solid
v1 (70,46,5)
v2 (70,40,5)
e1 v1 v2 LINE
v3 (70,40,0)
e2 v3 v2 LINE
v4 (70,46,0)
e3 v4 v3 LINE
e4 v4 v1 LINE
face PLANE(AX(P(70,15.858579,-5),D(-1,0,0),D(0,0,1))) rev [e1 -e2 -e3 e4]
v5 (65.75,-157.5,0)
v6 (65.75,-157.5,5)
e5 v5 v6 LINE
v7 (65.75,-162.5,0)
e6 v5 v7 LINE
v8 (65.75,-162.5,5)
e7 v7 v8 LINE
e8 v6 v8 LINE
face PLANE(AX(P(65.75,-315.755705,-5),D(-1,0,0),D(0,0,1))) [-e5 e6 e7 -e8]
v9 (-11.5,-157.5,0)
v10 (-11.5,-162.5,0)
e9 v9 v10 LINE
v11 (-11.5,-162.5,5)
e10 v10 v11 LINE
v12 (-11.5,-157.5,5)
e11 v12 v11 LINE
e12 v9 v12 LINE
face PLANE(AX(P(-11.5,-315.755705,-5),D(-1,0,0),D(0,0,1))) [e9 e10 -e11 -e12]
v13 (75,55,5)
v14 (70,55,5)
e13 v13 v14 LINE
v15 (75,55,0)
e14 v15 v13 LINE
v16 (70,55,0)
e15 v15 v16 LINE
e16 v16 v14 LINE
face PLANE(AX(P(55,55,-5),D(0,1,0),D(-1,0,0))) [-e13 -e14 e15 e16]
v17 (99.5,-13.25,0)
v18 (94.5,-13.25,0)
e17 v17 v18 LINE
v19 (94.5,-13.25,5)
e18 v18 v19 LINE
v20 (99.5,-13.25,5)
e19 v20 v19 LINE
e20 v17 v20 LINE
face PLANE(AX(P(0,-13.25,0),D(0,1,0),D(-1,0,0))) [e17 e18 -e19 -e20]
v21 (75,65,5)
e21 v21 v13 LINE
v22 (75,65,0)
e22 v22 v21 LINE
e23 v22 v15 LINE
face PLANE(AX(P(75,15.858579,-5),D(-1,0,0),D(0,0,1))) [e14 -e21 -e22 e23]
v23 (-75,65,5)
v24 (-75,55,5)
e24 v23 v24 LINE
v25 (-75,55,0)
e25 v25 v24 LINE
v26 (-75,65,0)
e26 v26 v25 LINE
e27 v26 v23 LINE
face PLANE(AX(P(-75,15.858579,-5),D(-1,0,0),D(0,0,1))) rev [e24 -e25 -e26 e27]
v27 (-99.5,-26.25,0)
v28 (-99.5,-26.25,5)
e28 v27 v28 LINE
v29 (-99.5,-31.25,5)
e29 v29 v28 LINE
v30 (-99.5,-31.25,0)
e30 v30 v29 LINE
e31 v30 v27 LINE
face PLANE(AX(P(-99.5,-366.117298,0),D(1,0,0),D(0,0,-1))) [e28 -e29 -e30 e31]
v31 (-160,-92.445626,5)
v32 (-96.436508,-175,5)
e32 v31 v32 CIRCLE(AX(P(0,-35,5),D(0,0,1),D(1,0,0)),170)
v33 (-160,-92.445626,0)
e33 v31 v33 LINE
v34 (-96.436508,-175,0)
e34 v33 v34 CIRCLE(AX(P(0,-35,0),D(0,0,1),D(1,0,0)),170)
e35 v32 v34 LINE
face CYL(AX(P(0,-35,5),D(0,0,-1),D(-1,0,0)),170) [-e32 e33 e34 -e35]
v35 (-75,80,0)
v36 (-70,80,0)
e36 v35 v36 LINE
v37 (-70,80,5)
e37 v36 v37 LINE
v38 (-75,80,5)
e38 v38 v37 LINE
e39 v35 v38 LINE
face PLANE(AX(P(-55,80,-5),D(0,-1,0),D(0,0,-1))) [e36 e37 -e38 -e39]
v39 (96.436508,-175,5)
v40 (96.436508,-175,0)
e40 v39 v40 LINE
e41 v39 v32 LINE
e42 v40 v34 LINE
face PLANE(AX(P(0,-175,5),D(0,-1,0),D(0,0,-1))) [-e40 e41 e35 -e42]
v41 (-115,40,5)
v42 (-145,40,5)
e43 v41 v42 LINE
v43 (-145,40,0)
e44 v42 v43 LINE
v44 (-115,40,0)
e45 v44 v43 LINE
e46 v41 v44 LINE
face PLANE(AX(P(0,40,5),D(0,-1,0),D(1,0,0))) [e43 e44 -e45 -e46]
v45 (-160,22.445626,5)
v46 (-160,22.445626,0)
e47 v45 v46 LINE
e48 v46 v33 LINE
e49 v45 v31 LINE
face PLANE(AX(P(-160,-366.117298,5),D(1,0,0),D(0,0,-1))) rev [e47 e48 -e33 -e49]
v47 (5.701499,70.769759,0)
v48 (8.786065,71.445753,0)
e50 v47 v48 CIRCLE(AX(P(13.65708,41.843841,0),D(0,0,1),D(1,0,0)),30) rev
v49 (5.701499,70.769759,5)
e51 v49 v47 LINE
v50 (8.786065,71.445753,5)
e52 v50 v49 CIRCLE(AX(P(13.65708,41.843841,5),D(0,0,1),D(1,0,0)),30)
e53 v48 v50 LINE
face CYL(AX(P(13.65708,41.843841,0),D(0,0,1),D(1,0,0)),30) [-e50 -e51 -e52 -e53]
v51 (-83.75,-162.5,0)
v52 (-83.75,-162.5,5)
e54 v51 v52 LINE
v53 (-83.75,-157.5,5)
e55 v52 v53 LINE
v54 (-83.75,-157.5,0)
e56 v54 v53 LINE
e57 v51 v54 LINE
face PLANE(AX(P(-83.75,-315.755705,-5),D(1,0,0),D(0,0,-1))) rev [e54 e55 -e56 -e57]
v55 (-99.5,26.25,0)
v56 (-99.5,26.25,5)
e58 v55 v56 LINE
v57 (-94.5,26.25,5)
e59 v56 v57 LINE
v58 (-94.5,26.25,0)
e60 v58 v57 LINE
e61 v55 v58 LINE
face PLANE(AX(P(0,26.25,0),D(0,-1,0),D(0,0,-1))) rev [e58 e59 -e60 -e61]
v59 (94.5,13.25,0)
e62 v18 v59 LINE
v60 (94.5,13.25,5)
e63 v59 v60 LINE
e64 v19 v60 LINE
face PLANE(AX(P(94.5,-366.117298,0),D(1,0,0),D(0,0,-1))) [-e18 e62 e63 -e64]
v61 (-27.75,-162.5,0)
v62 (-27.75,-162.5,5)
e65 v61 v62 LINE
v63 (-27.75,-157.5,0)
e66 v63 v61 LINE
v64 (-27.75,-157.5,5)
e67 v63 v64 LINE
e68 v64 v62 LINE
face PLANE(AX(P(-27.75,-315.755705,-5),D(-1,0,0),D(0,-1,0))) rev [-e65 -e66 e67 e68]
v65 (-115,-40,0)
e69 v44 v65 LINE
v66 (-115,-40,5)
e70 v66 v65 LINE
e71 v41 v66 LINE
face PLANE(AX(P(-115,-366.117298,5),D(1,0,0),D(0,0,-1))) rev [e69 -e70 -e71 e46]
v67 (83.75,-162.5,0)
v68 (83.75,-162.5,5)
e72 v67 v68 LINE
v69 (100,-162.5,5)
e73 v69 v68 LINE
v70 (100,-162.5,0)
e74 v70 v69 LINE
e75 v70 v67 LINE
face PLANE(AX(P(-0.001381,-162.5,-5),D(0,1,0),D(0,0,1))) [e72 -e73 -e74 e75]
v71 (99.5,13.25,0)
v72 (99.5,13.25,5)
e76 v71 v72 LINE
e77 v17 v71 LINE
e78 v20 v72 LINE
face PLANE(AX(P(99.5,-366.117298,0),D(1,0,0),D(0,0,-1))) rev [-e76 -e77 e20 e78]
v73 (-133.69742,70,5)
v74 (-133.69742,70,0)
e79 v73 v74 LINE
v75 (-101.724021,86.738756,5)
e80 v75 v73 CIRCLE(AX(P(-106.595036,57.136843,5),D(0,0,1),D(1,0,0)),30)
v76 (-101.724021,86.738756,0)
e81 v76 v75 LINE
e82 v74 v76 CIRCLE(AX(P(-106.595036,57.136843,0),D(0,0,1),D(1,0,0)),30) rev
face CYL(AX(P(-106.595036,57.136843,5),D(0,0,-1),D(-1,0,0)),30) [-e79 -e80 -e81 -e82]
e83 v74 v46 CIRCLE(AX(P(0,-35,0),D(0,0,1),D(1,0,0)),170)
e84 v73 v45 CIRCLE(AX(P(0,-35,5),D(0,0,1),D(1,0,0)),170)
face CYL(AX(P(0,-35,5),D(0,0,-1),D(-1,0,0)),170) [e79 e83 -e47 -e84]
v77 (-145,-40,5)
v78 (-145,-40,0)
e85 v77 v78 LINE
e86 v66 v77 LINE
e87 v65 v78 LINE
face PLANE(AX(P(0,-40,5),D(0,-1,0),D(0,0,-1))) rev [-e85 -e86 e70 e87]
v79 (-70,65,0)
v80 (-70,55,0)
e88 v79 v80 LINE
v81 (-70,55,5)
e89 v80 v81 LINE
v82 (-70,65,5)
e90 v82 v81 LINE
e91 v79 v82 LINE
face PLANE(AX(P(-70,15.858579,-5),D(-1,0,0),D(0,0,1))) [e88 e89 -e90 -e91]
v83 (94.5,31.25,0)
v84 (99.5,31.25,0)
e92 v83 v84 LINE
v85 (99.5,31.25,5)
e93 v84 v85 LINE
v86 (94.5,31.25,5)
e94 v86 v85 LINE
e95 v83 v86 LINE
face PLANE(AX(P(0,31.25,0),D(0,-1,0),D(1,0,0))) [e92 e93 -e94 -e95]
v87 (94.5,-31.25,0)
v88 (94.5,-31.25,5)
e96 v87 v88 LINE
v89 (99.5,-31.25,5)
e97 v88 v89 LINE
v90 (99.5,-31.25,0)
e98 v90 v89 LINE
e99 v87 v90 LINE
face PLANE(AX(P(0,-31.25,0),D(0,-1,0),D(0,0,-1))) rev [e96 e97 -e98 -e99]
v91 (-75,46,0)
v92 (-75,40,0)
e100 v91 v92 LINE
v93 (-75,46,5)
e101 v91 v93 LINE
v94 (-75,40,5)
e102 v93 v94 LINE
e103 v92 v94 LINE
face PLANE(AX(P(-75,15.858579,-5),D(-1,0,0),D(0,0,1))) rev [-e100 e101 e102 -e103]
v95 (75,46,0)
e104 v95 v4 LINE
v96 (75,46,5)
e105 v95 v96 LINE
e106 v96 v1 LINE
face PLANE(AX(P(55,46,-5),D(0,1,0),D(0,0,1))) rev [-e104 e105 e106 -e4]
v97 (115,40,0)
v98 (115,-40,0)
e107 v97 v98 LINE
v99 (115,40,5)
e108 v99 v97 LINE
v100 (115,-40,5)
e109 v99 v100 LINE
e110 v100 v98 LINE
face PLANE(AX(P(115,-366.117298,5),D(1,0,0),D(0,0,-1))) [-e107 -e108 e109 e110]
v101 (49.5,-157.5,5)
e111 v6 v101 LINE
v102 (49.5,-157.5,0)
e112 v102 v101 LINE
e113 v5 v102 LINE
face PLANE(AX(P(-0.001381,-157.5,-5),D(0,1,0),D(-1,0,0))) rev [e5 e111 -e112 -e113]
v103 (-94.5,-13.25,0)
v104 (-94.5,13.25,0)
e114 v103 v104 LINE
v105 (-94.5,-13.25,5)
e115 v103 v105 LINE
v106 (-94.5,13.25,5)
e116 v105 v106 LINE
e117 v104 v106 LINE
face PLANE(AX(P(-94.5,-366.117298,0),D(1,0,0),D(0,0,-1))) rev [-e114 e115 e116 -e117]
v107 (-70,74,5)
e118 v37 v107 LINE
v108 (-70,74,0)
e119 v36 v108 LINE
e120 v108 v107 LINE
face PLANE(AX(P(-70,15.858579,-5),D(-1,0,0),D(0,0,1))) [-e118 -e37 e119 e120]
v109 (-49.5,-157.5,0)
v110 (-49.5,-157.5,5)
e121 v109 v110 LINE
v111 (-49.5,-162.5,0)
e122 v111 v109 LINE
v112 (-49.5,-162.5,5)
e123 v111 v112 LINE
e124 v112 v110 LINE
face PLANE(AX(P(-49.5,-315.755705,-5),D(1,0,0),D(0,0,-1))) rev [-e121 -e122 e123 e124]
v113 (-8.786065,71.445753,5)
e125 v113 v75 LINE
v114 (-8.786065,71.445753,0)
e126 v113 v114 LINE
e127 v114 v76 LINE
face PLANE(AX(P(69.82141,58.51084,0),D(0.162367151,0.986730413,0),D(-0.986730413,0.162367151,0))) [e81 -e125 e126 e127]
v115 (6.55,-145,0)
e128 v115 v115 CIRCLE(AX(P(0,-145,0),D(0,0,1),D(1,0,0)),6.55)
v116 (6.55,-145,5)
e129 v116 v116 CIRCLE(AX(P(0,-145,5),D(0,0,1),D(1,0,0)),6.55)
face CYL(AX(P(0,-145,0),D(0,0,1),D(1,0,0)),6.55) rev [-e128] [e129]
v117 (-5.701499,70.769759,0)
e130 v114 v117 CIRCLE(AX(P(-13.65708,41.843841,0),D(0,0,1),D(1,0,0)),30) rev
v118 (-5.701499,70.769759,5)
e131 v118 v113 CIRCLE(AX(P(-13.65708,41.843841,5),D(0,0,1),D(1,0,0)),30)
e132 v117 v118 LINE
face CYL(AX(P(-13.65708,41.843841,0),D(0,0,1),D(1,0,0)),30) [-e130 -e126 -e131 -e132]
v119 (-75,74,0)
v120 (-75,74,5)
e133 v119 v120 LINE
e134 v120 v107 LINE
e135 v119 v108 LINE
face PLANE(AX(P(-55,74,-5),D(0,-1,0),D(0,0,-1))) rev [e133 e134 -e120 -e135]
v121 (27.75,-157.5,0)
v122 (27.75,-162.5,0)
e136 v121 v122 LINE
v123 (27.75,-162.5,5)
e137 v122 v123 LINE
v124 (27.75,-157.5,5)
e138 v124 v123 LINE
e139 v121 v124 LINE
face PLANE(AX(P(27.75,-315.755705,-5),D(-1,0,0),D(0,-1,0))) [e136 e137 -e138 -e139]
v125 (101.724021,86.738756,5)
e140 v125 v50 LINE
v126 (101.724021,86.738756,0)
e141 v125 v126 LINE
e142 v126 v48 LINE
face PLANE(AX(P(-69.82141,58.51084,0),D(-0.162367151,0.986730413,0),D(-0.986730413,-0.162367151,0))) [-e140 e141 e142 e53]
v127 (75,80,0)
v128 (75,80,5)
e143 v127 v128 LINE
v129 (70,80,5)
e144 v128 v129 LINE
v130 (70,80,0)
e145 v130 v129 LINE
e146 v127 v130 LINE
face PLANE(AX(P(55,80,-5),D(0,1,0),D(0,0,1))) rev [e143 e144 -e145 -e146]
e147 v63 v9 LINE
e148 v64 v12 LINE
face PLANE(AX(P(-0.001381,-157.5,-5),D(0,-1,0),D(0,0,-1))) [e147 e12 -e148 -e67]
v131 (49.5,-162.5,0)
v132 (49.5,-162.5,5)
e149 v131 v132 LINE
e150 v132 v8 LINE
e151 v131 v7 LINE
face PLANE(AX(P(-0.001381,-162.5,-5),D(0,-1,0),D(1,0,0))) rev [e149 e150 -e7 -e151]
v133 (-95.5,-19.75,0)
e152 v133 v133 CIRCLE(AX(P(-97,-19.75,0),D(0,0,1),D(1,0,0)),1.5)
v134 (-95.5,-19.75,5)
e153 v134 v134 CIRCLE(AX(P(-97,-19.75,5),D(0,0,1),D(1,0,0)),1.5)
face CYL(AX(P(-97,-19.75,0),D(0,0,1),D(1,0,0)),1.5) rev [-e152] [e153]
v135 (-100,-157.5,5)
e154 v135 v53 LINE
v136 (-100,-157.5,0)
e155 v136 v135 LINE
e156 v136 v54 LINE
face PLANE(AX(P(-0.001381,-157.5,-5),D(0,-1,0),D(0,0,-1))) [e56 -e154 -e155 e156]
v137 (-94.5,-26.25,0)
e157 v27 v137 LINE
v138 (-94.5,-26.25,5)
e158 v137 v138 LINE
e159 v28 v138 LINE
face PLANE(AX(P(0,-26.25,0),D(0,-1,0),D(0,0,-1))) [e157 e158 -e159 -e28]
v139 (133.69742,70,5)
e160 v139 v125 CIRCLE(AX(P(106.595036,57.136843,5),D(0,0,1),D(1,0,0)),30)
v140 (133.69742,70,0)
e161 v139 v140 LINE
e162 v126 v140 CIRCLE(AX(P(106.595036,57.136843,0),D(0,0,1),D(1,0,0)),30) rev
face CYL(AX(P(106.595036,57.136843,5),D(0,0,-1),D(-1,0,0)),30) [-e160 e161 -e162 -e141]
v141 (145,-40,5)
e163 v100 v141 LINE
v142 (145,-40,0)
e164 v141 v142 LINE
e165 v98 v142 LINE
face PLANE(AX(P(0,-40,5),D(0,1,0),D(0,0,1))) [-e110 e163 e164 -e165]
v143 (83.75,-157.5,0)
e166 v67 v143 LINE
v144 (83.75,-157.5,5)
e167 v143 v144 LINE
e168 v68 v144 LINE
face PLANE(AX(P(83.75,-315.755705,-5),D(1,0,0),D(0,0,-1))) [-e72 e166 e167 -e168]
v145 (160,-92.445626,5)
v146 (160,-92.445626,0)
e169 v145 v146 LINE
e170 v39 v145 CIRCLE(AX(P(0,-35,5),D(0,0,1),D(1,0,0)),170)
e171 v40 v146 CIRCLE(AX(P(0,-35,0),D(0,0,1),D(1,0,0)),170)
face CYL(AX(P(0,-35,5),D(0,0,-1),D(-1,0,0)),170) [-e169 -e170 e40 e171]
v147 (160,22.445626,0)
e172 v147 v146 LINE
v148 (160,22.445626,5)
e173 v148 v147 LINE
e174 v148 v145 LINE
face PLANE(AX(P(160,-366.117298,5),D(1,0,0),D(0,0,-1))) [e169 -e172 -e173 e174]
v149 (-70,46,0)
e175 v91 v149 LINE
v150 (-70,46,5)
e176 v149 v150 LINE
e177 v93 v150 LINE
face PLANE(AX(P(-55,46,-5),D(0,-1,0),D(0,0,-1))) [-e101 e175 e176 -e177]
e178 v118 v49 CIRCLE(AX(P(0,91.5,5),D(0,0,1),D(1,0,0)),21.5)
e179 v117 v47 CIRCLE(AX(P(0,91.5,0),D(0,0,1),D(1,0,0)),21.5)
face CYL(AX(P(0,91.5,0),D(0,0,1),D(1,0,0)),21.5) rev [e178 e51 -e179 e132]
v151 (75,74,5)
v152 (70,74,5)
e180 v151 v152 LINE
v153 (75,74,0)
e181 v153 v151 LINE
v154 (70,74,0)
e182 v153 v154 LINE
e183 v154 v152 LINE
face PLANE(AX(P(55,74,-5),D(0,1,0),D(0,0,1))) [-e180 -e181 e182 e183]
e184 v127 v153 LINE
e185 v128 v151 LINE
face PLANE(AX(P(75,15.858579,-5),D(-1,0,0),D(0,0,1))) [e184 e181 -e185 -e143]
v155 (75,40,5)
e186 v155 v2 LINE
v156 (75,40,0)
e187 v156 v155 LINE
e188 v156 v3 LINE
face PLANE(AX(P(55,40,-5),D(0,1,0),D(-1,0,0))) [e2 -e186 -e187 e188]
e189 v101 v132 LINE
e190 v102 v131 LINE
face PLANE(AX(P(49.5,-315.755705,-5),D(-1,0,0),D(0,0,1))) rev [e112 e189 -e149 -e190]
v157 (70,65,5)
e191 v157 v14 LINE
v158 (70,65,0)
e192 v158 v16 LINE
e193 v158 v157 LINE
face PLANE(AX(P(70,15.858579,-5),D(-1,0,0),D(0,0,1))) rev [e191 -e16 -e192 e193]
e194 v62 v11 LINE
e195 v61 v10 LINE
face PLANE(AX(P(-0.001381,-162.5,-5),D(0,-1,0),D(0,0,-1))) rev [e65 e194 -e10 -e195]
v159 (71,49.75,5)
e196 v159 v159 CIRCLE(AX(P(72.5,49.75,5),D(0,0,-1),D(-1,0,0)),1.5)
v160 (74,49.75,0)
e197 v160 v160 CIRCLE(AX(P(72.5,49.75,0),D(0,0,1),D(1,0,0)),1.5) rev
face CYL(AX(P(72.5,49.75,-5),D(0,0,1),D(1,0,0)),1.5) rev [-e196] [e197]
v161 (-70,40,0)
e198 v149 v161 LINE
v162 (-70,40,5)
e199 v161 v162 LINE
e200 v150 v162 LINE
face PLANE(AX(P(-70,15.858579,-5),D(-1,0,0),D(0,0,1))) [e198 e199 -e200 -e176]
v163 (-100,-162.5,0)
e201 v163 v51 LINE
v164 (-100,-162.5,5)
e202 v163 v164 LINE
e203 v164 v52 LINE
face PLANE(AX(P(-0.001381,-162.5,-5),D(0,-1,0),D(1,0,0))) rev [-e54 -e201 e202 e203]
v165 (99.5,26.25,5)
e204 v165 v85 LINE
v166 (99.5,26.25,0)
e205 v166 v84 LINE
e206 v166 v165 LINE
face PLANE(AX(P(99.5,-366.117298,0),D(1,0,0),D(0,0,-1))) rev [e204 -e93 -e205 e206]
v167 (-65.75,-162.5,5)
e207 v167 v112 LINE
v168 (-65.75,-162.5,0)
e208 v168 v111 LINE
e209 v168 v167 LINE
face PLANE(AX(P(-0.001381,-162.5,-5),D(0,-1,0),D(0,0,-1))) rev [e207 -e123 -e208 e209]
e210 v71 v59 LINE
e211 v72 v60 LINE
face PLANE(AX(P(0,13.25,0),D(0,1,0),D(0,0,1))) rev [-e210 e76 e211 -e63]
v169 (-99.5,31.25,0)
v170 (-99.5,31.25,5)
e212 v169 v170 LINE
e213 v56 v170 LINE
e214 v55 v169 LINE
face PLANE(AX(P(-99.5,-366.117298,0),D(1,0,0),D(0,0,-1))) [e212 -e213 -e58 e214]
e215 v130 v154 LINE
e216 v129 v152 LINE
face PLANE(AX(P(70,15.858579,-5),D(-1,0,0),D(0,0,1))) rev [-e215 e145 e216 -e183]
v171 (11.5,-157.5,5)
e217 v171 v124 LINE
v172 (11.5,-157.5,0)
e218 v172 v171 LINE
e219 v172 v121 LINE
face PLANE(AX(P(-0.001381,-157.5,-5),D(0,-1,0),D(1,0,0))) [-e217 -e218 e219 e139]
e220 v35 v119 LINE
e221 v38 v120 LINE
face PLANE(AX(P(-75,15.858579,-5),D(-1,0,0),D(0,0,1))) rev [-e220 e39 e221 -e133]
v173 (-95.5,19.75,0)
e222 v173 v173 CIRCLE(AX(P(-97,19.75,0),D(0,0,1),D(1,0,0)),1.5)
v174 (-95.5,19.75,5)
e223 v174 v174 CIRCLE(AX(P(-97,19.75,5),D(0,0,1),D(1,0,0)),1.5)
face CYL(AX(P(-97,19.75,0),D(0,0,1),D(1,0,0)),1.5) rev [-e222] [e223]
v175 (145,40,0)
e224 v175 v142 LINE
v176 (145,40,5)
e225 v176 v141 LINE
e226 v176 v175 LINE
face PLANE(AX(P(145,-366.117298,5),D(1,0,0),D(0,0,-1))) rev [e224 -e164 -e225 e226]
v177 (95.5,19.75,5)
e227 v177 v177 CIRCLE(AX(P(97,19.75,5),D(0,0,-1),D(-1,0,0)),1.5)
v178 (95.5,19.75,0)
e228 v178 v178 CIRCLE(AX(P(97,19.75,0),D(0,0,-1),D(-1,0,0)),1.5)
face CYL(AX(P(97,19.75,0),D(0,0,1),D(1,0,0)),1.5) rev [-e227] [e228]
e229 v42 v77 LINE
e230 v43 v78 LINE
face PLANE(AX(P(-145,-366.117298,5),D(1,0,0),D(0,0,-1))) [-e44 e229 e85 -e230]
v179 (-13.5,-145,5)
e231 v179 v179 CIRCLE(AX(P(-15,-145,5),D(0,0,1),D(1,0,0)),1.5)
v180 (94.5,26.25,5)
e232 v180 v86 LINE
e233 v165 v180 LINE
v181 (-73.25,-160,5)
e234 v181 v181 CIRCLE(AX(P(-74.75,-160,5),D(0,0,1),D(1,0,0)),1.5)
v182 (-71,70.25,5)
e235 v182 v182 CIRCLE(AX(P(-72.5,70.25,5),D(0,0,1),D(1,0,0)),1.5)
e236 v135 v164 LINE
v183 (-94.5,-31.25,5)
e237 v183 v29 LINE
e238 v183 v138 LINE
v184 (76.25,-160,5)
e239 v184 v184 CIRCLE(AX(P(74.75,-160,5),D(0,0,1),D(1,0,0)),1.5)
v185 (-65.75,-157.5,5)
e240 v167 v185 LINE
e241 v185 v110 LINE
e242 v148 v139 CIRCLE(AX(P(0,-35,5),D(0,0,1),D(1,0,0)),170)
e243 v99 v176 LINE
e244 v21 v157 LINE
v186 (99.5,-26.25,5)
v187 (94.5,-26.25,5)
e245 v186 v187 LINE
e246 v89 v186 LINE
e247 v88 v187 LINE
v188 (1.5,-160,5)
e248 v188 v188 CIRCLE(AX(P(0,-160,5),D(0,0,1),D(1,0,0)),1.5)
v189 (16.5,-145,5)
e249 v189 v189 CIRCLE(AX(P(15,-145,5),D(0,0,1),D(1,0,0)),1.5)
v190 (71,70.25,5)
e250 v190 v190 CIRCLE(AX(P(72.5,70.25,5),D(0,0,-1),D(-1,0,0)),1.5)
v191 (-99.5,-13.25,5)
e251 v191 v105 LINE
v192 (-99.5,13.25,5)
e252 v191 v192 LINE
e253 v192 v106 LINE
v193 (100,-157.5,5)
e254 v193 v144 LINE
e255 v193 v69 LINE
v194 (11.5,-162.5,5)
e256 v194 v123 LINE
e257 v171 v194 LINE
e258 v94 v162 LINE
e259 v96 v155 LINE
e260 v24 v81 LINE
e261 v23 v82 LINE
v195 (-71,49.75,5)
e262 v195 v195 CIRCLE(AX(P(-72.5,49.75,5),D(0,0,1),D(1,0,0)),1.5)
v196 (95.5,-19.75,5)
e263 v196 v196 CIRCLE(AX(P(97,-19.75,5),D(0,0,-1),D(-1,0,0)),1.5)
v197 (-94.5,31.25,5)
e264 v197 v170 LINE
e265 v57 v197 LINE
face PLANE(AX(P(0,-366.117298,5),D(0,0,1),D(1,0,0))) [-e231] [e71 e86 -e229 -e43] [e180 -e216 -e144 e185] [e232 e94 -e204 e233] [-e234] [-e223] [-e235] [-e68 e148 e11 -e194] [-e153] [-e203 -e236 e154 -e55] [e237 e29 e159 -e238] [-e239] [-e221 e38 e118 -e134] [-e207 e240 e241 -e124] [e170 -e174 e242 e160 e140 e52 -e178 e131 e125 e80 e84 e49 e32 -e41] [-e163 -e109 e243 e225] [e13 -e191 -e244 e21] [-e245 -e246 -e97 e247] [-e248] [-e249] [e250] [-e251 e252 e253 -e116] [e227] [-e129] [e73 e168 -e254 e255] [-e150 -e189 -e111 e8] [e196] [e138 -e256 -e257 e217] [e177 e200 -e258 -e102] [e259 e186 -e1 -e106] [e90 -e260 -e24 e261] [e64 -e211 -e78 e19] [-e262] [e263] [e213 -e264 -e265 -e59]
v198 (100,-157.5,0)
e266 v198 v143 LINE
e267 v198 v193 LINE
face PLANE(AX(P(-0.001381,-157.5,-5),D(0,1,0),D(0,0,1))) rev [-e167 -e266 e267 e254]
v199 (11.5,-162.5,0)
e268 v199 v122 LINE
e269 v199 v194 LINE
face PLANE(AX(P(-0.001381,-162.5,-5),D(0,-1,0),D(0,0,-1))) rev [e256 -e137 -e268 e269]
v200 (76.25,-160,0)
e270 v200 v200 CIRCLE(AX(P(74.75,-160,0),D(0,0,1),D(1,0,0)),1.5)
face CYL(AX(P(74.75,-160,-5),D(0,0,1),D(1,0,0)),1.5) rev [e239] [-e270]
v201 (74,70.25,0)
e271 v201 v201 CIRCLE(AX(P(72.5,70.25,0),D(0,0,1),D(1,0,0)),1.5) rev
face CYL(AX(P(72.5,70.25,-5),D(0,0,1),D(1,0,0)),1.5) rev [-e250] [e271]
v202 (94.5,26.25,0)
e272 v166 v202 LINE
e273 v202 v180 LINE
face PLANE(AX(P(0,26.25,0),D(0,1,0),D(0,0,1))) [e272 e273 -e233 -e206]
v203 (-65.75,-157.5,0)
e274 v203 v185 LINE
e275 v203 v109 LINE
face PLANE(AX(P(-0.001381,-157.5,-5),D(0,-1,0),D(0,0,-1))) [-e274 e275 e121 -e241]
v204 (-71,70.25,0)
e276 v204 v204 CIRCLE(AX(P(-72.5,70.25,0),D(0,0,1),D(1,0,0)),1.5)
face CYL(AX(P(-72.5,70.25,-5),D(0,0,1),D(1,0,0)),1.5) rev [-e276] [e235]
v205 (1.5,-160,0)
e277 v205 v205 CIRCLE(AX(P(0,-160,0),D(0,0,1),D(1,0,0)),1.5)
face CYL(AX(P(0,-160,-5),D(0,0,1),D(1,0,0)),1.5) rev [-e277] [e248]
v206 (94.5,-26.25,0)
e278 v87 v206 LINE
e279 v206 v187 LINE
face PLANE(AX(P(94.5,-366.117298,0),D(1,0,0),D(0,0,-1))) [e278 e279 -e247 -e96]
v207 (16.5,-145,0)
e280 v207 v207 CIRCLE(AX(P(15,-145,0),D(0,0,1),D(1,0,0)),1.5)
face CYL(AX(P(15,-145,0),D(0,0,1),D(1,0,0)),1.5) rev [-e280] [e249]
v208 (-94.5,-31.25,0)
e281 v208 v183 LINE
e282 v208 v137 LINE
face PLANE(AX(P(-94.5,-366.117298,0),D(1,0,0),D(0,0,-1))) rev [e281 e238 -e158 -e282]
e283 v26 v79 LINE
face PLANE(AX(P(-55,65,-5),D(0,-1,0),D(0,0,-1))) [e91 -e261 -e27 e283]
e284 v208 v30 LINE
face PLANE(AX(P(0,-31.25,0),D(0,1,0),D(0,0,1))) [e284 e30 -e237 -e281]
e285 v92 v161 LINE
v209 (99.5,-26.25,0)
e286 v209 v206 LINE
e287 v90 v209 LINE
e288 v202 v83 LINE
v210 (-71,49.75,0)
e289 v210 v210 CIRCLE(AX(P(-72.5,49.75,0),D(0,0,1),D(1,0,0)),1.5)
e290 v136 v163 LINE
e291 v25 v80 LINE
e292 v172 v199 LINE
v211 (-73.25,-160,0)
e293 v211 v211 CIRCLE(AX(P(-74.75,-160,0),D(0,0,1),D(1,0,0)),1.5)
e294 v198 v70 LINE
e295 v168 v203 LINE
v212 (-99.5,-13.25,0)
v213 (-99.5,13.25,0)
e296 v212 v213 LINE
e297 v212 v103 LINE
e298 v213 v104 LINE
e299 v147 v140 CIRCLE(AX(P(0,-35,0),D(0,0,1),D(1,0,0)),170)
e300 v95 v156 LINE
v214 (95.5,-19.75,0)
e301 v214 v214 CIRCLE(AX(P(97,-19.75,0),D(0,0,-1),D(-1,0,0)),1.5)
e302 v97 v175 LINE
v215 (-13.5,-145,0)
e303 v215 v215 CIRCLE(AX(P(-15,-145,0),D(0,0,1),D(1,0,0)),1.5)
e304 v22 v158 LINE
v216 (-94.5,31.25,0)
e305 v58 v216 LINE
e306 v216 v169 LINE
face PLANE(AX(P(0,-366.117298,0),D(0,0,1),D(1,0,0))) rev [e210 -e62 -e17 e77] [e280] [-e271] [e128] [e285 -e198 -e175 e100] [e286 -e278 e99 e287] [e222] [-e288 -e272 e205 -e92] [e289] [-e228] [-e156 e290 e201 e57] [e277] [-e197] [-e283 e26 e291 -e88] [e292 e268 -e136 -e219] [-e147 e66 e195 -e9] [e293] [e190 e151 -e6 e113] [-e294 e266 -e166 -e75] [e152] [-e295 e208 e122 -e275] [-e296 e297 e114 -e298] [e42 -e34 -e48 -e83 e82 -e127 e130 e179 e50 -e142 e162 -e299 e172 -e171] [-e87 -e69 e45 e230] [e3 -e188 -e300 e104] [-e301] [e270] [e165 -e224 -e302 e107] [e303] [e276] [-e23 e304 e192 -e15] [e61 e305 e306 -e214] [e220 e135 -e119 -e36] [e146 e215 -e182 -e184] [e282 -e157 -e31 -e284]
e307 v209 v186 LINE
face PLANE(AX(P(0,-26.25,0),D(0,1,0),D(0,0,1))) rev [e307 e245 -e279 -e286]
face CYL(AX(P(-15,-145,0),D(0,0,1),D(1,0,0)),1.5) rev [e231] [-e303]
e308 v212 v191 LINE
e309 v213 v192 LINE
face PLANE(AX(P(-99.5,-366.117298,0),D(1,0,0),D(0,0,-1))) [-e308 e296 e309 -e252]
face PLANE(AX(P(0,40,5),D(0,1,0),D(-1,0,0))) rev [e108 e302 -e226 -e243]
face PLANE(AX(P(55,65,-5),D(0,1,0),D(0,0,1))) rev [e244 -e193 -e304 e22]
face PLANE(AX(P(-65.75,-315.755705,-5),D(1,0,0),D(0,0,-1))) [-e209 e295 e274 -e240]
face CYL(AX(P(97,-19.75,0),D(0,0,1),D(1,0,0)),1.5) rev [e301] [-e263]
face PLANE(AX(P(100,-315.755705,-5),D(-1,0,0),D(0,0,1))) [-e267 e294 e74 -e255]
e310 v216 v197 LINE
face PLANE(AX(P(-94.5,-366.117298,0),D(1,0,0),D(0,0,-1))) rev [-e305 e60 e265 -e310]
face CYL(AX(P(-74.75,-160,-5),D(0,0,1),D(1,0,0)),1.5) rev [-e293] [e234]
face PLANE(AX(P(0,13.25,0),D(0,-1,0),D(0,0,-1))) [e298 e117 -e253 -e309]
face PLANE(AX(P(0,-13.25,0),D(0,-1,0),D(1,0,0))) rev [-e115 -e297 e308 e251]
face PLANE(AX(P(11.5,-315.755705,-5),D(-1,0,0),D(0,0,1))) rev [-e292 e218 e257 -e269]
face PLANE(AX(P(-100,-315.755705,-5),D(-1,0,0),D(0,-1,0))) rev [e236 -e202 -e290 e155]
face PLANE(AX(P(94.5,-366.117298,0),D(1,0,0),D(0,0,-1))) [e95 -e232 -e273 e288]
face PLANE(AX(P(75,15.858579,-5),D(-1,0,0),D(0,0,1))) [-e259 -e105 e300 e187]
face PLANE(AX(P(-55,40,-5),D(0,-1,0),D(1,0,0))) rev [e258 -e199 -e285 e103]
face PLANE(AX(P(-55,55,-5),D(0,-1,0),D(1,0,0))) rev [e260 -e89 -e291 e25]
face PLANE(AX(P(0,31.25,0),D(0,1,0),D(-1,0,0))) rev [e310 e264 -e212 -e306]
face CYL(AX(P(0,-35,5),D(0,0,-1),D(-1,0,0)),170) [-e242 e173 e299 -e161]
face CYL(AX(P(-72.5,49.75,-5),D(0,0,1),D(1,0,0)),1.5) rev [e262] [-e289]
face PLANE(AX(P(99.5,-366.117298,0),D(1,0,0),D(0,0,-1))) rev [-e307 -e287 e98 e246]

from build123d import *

# Parameters (mm, degrees)
SKETCH1_W           = 30
SKETCH1_H           = 80
BOSS_EXTRUDE1_DEPTH = 5
SKETCH2_W           = 5
SKETCH2_H           = 26.5
SKETCH2_H_2         = 5
SKETCH2_R           = 1.5
CUT_EXTRUDE1_DEPTH  = 5
BOSS_EXTRUDE2_DEPTH = 5
FILLET1_R           = 30
SKETCH5_R           = 6.55
SKETCH5_R_2         = 1.5
CUT_EXTRUDE2_DEPTH  = 5
SKETCH6_W           = 16.25
SKETCH6_H           = 5
SKETCH6_R           = 1.5
CUT_EXTRUDE3_DEPTH  = 10
SKETCH7_W           = 5
SKETCH7_H           = 5.5
SKETCH7_H_2         = 10
SKETCH7_H_3         = 6
SKETCH7_R           = 1.5
CUT_EXTRUDE4_DEPTH  = 10
SKETCH8_W           = 5.078430198
SKETCH8_H           = 27.315407993
SKETCH8_W_2         = 5
SKETCH8_H_2         = 26.5
BOSS_EXTRUDE4_DEPTH = 5


with BuildPart() as part:
    # Sketch1 → Boss-Extrude1 (new body)
    with BuildSketch(Plane.XY):
        with BuildLine():
            Line((133.697419571, 70), (-133.697419571, 70))
            ThreePointArc((-133.697419571, 70), (-148.761211935, 47.280628484), (-160, 22.445626465))
            Line((-160, 22.445626465), (-160, -92.445626465))
            ThreePointArc((-160, -92.445626465), (-134.69865165, -138.712454622), (-96.43650761, -175))
            Line((-96.43650761, -175), (96.43650761, -175))
            ThreePointArc((96.43650761, -175), (134.69865165, -138.712454622), (160, -92.445626465))
            Line((160, -92.445626465), (160, 22.445626465))
            ThreePointArc((160, 22.445626465), (148.761211935, 47.280628484), (133.697419571, 70))
        make_face()
        with Locations((-130, 0)):
            Rectangle(SKETCH1_W, SKETCH1_H, mode=Mode.SUBTRACT)
        with Locations((130, 0)):
            Rectangle(SKETCH1_W, SKETCH1_H, mode=Mode.SUBTRACT)
    extrude(amount=BOSS_EXTRUDE1_DEPTH)

    # Sketch2 → Cut-Extrude1 (cut)
    with BuildSketch(Plane.XY.offset(5)):
        with Locations((-97, 0)):
            Rectangle(SKETCH2_W, SKETCH2_H)
        with Locations((-97, 28.75)):
            Rectangle(SKETCH2_W, SKETCH2_H_2)
        with Locations((-97, -28.75)):
            Rectangle(SKETCH2_W, SKETCH2_H_2)
        with Locations((-97, -19.75)):
            Circle(SKETCH2_R)
        with Locations((-97, 19.75)):
            Circle(SKETCH2_R)
    cut_extrude1 = extrude(amount=-CUT_EXTRUDE1_DEPTH, mode=Mode.SUBTRACT)

    # Mirror1: Cut-Extrude1 across plane
    add(cut_extrude1.mirror(Plane(origin=(0, 0, 0), x_dir=(0, 0, 1), z_dir=(1, 0, 0))), mode=Mode.SUBTRACT)

    # Sketch3 → Boss-Extrude2 (add)
    with BuildSketch(Plane.XY.offset(5)):
        with BuildLine():
            ThreePointArc((-2.08e-07, 70), (-3.490893846, 70.285296133), (-6.889142051, 71.133612942))
            Line((-6.889142051, 71.133612942), (-133.697419571, 92))
            Line((-133.697419571, 92), (-133.697419571, 70))
            Line((-133.697419571, 70), (-2.08e-07, 70))
        make_face()
        with BuildLine():
            ThreePointArc((6.889142051, 71.133612942), (3.49089364, 70.285296099), (-2.08e-07, 70))
            Line((-2.08e-07, 70), (133.697419571, 70))
            Line((133.697419571, 70), (133.697419571, 92))
            Line((133.697419571, 92), (6.889142051, 71.133612942))
        make_face()
    extrude(amount=-BOSS_EXTRUDE2_DEPTH)

    # Fillet1
    # the kernel refuses this fillet: 30 mm, written as the material it takes off along each edge
    with BuildSketch(Plane(origin=(-6.889142051, 71.133612942, 9.806082425), x_dir=(-0.9867304131972112, 0.16236715083926523, 0), z_dir=(0, 0, -1))) as fillet1_piece_1:
        with BuildLine():
            CenterArc((1.92243297, -30), FILLET1_R, 90, 6.03368508)
            Line((-1.230961232, -0.166191912), (-1.294029116, 0.430484249))
            ThreePointArc((-1.294029116, 0.430484249), (-0.694557768, 0.502617916), (-0.097420291, 0.592038248))
            Line((-0.097420291, 0.592038248), (0, 0.6))
            Line((0, 0.6), (1.92243297, 0.6))
            Line((1.92243297, 0.6), (1.92243297, 0))
        make_face()
    extrude(amount=14.612164849, mode=Mode.SUBTRACT)
    with BuildSketch(Plane(origin=(6.889142051, 71.133612942, 9.806082425), x_dir=(-0.9561345473491755, -0.29292785351582257, 0), z_dir=(0, 0, -1))) as fillet1_piece_2:
        with BuildLine():
            CenterArc((2.108731211, -29.987480741), FILLET1_R, 91.655317917, 6.03368508)
            Line((-1.905148179, -0.257213803), (-1.985425767, 0.337391536))
            Line((-1.985425767, 0.337391536), (-0.080277588, 0.594605339))
            Line((-0.080277588, 0.594605339), (0.017332037, 0.599749615))
            ThreePointArc((0.017332037, 0.599749615), (0.621064672, 0.591027865), (1.224797306, 0.599749615))
            Line((1.224797306, 0.599749615), (1.242129344, 0))
        make_face()
    extrude(amount=14.612164849, mode=Mode.SUBTRACT)
    with BuildSketch(Plane(origin=(133.697419571, 92, 86.008444254), x_dir=(-0.9867304131972118, -0.16236715083926206, 0), z_dir=(0, 0, -1))) as fillet1_piece_3:
        with BuildLine():
            CenterArc((32.403377702, -30), FILLET1_R, 90, 73.954674896)
            Line((3.572077318, -21.70806909), (2.995451311, -21.542230472))
            ThreePointArc((2.995451311, -21.542230472), (1.194000411, -10.951454836), (-0.592038248, -0.097420291))
            Line((-0.592038248, -0.097420291), (0, 0.6))
            Line((0, 0.6), (32.403377702, 0.6))
            Line((32.403377702, 0.6), (32.403377702, 0))
        make_face()
    extrude(amount=167.016888509, mode=Mode.SUBTRACT)
    with BuildSketch(Plane(origin=(-133.697419571, 92, 86.008444254), x_dir=(0, -1, 0), z_dir=(0, 0, -1))) as fillet1_piece_4:
        with BuildLine():
            CenterArc((34.863156511, -27.102383743), FILLET1_R, 115.389646017, 73.954674896)
            Line((5.261244115, -31.973398269), (4.669205867, -32.070818559))
            Line((4.669205867, -32.070818559), (-0.592038248, -0.097420291))
            Line((-0.592038248, -0.097420291), (0, 0.6))
            ThreePointArc((0, 0.6), (11, 0.6), (21.74273687, 0.542047675))
            Line((21.74273687, 0.542047675), (22, 0))
        make_face()
    extrude(amount=167.016888509, mode=Mode.SUBTRACT)

    # Sketch5 → Cut-Extrude2 (cut)
    with BuildSketch(Plane.XY.offset(5)):
        with Locations((0, -145)):
            Circle(SKETCH5_R)
        with Locations((15, -145)):
            Circle(SKETCH5_R_2)
        with Locations((-15, -145)):
            Circle(SKETCH5_R_2)
    extrude(amount=-CUT_EXTRUDE2_DEPTH, mode=Mode.SUBTRACT)

    # Sketch6 → Cut-Extrude3 (cut)
    with BuildSketch(Plane.XY.offset(5)):
        with Locations((-91.875, -160)):
            Rectangle(SKETCH6_W, SKETCH6_H)
        with Locations((-57.625, -160)):
            Rectangle(SKETCH6_W, SKETCH6_H)
        with Locations((-19.625, -160)):
            Rectangle(SKETCH6_W, SKETCH6_H)
        with Locations((19.625, -160)):
            Rectangle(SKETCH6_W, SKETCH6_H)
        with Locations((57.625, -160)):
            Rectangle(SKETCH6_W, SKETCH6_H)
        with Locations((91.875, -160)):
            Rectangle(SKETCH6_W, SKETCH6_H)
        with Locations((0, -160)):
            Circle(SKETCH6_R)
        with Locations((-74.75, -160)):
            Circle(SKETCH6_R)
        with Locations((74.75, -160)):
            Circle(SKETCH6_R)
    extrude(amount=-CUT_EXTRUDE3_DEPTH, mode=Mode.SUBTRACT)

    # Sketch7 → Cut-Extrude4 (cut)
    with BuildSketch(Plane.XY.offset(5)):
        with Locations((-37.5, 69.75)):
            Rectangle(SKETCH7_W, SKETCH7_H)
        with Locations((-37.5, 51)):
            Rectangle(SKETCH7_W, SKETCH7_H_2)
        with Locations((-72.5, 60)):
            Rectangle(SKETCH7_W, SKETCH7_H_2)
        with Locations((-72.5, 77)):
            Rectangle(SKETCH7_W, SKETCH7_H_3)
        with Locations((-72.5, 43)):
            Rectangle(SKETCH7_W, SKETCH7_H_3)
        with Locations((-37.5, 62.5)):
            Circle(SKETCH7_R)
        with Locations((-72.5, 70.25)):
            Circle(SKETCH7_R)
        with Locations((-72.5, 49.75)):
            Circle(SKETCH7_R)
    cut_extrude4 = extrude(amount=-CUT_EXTRUDE4_DEPTH, mode=Mode.SUBTRACT)

    # Mirror2: Cut-Extrude4 across plane
    add(cut_extrude4.mirror(Plane(origin=(0, 0, 0), x_dir=(0, 0, 1), z_dir=(1, 0, 0))), mode=Mode.SUBTRACT)

    # Sketch8 → Boss-Extrude4 (add)
    with BuildSketch(Plane.XY.offset(5)):
        with Locations((-37.539215099, 59.657703997)):
            Rectangle(SKETCH8_W, SKETCH8_H)
        with Locations((37.5, 59.25)):
            Rectangle(SKETCH8_W_2, SKETCH8_H_2)
    extrude(amount=-BOSS_EXTRUDE4_DEPTH)


solid = part.part
